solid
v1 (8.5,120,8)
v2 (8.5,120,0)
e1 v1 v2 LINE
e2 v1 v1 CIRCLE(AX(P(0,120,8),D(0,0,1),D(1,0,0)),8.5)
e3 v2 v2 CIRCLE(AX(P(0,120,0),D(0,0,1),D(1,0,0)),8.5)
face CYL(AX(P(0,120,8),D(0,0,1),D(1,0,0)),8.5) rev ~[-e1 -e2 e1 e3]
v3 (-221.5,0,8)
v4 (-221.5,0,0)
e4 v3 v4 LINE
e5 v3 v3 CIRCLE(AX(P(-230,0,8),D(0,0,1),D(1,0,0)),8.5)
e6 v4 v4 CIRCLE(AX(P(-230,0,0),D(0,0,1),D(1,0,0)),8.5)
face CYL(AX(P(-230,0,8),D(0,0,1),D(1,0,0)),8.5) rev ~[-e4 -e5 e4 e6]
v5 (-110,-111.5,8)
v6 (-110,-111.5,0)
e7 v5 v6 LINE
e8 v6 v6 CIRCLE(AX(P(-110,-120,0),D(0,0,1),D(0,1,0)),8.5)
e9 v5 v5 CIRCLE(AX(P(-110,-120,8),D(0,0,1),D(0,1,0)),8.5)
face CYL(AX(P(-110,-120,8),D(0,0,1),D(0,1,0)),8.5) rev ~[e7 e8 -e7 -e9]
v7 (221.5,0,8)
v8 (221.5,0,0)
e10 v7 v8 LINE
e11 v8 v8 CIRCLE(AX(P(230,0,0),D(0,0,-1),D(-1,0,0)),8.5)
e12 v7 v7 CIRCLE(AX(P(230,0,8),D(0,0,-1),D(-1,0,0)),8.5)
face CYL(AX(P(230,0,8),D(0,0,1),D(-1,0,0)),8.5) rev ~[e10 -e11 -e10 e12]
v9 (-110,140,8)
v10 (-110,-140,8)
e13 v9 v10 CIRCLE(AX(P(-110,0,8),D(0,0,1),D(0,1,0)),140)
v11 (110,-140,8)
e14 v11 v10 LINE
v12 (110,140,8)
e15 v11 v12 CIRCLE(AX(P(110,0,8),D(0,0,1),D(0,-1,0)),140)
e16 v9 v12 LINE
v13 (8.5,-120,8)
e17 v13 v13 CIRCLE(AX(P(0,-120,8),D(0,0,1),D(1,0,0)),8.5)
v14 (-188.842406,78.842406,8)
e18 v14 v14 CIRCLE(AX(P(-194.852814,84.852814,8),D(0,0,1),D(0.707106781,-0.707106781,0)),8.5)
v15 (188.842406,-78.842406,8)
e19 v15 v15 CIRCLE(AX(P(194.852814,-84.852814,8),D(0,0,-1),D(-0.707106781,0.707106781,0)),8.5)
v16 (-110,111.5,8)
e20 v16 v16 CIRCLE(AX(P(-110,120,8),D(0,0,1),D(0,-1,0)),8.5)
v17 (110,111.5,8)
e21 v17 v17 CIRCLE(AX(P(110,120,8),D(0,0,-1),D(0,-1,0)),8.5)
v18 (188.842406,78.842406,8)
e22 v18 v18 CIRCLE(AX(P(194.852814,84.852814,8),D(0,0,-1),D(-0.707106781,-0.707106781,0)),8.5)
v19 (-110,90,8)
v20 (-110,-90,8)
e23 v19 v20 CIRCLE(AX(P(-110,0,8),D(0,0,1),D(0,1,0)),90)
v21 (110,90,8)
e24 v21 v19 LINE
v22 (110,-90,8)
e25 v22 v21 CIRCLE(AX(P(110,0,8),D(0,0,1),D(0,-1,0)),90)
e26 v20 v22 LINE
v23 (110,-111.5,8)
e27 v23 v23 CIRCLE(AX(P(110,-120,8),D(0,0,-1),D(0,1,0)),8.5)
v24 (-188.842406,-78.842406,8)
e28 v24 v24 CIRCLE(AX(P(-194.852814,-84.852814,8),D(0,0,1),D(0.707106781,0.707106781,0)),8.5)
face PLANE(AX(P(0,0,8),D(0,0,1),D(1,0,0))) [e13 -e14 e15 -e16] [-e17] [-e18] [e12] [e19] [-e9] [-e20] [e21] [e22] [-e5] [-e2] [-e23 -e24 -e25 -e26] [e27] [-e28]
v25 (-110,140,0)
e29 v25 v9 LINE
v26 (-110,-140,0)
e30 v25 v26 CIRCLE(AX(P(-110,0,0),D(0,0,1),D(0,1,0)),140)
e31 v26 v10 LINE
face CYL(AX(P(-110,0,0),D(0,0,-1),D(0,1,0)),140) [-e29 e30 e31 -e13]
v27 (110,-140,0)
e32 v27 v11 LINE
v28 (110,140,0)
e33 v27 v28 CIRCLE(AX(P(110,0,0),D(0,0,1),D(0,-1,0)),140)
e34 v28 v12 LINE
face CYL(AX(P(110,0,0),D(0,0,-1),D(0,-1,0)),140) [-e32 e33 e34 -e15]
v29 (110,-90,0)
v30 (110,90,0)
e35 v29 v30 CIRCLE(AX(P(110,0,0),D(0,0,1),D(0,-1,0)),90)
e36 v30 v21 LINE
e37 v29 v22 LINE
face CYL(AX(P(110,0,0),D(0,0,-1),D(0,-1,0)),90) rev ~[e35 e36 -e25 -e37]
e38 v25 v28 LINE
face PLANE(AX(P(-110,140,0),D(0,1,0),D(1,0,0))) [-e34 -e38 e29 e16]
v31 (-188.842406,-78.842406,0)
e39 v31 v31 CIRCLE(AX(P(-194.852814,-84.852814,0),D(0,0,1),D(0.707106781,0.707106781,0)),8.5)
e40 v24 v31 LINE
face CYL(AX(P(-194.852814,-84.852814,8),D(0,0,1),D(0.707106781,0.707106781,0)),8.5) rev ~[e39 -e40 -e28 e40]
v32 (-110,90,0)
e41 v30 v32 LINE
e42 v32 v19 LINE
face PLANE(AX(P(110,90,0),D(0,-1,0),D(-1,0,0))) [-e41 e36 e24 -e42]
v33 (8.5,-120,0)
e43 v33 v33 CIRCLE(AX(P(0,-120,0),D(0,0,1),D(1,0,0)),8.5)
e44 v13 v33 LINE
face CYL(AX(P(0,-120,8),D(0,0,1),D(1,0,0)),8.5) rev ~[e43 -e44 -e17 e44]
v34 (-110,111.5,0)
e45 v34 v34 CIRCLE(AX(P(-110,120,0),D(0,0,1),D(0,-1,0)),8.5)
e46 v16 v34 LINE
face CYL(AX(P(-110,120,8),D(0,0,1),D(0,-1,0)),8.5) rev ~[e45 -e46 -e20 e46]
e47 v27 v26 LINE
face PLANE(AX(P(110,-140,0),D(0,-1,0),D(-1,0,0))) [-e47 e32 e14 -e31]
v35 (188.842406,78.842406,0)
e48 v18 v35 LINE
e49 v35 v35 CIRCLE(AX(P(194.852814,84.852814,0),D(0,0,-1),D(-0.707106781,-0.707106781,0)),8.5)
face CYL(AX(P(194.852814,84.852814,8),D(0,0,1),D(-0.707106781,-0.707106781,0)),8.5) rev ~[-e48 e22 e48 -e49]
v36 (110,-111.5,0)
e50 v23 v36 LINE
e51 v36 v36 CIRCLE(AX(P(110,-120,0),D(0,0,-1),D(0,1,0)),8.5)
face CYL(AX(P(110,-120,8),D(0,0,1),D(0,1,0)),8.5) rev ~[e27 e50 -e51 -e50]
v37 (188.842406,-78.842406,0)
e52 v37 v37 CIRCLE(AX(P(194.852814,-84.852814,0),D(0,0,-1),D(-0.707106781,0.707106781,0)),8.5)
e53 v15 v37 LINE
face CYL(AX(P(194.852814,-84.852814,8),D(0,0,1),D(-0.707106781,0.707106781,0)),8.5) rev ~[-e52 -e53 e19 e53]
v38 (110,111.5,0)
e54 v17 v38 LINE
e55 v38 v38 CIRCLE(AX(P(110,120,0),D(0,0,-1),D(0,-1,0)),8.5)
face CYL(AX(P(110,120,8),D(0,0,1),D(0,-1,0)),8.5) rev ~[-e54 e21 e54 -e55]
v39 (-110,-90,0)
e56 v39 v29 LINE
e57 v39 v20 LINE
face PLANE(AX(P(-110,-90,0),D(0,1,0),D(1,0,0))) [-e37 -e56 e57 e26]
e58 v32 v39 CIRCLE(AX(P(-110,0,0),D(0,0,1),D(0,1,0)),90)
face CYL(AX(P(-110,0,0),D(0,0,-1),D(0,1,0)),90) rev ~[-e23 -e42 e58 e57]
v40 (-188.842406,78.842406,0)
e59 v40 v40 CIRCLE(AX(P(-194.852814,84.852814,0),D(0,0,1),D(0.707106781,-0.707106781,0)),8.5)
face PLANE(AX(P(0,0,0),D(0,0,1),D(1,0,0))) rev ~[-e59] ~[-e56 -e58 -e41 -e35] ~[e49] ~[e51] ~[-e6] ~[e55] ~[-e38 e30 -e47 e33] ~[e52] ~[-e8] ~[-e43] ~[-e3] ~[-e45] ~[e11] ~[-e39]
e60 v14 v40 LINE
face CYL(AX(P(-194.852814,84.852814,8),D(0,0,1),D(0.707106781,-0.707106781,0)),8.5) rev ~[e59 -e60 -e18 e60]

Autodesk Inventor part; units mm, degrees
ref_plane "YZ Plane" through (0, 0, 0) normal (1, 0, 0) x (0, 1, 0)
ref_plane "XZ Plane" through (0, 0, 0) normal (0, 1, 0) x (-1, 0, 0)
ref_plane "XY Plane" through (0, 0, 0) normal (0, 0, 1) x (1, 0, 0)
sketch "Sketch2" plane through (0, 0, 0) normal (0, 0, 1) x (1, 0, 0)
  line L0 (-110, 0) -> (110, 0) construction
  line L1 (-110, -90) -> (110, -90)
  line L2 (110, 90) -> (-110, 90)
  arc A0 (-110, 90) -> (-110, -90) centre (-110, 0) ccw
  arc A1 (110, -90) -> (110, 90) centre (110, 0) ccw
  line L3 (-200, 0) -> (200, 0) construction
  line L4 (-110, 140) -> (110, 140)
  arc A2 (110, -140) -> (110, 140) centre (110, 0) ccw
  line L5 (110, -140) -> (-110, -140)
  arc A3 (-110, 140) -> (-110, -140) centre (-110, 0) ccw
  point P0 (0, 0)
  dimension "Charging_hatch_width" = 400
  dimension "d11" = 400
  dimension "d12" = 180
  dimension "d13" = 50
extrude "Plate2" add sketch "Sketch2" along normal blind 8
sketch "Sketch3" plane through (0, 0, 8) normal (0, 0, 1) x (1, 0, 0)
  arc A0 (-110, 140) -> (-110, -140) centre (-110, 0) ccw construction
  line L0 (-110, 140) -> (110, 140) construction
  arc A1 (110, -140) -> (110, 140) centre (110, 0) ccw construction
  line L1 (110, -140) -> (-110, -140) projected
  circle A2 centre (-230, 0) radius 8.5
  arc A3 (-110, 120) -> (-110, -120) centre (-110, 0) ccw construction
  line L2 (-110, 120) -> (110, 120) construction
  arc A4 (110, -120) -> (110, 120) centre (110, 0) ccw construction
  line L3 (110, -120) -> (-110, -120) construction
  point P0 (0, 0)
  dimension "Charging_hatch_width" = 400
  dimension "d15" = 17
  dimension "d16" = 20
extrude "Cut1" cut sketch "Sketch3" against normal blind 8
pattern_circular "Circular Pattern1" count 5 over 180 about axis through (-110, 0, 0) along (0, 0, 1) of "Cut1" both ways yes
mirror "Mirror1" about plane through (0, 0, 0) normal (1, 0, 0) of "Cut1", "Circular Pattern1"
sketch "Sketch4" plane through (0, 0, 8) normal (0, 0, 1) x (1, 0, 0)
  circle A0 centre (-110, 120) radius 8.5 construction
  circle A1 centre (110, 120) radius 8.5 construction
  circle A2 centre (-110, -120) radius 8.5 construction
  circle A3 centre (110, -120) radius 8.5 construction
  circle A4 centre (0, -120) radius 8.5
  circle A5 centre (0, 120) radius 8.5
  point P0 (0, 0)
  dimension "Charging_hatch_width" = 400
  dimension "d22" = 0
extrude "Cut2" cut sketch "Sketch4" against normal blind 8
equation "\"d11\" = Charging_hatch_width"
equation "\"d12\" = Charging_hatch_hight"
equation "\"d17\" = Thickness"
equation "\"d23\" = Thickness"
equation "\"d14\" = Thickness"
equation "\"BendReliefWidth\" = Thickness"
equation "\"BendReliefDepth\" = 0.5 * Thickness"
equation "\"CornerReliefSize\" = 4 * Thickness"
equation "\"MinimumRemnant\" = 2 * Thickness"
equation "\"TransitionRadius\" = BendRadius"
equation "\"JacobiRadiusSize\" = BendRadius"
equation "\"GapSize\" = Thickness"
equation "\"Charging_hatch_hight\" = 180"
equation "\"Thickness\" = 8"
equation "\"BendRadius\" = 6"
properties part number "PNS-631 charging flange" material "Steel"
